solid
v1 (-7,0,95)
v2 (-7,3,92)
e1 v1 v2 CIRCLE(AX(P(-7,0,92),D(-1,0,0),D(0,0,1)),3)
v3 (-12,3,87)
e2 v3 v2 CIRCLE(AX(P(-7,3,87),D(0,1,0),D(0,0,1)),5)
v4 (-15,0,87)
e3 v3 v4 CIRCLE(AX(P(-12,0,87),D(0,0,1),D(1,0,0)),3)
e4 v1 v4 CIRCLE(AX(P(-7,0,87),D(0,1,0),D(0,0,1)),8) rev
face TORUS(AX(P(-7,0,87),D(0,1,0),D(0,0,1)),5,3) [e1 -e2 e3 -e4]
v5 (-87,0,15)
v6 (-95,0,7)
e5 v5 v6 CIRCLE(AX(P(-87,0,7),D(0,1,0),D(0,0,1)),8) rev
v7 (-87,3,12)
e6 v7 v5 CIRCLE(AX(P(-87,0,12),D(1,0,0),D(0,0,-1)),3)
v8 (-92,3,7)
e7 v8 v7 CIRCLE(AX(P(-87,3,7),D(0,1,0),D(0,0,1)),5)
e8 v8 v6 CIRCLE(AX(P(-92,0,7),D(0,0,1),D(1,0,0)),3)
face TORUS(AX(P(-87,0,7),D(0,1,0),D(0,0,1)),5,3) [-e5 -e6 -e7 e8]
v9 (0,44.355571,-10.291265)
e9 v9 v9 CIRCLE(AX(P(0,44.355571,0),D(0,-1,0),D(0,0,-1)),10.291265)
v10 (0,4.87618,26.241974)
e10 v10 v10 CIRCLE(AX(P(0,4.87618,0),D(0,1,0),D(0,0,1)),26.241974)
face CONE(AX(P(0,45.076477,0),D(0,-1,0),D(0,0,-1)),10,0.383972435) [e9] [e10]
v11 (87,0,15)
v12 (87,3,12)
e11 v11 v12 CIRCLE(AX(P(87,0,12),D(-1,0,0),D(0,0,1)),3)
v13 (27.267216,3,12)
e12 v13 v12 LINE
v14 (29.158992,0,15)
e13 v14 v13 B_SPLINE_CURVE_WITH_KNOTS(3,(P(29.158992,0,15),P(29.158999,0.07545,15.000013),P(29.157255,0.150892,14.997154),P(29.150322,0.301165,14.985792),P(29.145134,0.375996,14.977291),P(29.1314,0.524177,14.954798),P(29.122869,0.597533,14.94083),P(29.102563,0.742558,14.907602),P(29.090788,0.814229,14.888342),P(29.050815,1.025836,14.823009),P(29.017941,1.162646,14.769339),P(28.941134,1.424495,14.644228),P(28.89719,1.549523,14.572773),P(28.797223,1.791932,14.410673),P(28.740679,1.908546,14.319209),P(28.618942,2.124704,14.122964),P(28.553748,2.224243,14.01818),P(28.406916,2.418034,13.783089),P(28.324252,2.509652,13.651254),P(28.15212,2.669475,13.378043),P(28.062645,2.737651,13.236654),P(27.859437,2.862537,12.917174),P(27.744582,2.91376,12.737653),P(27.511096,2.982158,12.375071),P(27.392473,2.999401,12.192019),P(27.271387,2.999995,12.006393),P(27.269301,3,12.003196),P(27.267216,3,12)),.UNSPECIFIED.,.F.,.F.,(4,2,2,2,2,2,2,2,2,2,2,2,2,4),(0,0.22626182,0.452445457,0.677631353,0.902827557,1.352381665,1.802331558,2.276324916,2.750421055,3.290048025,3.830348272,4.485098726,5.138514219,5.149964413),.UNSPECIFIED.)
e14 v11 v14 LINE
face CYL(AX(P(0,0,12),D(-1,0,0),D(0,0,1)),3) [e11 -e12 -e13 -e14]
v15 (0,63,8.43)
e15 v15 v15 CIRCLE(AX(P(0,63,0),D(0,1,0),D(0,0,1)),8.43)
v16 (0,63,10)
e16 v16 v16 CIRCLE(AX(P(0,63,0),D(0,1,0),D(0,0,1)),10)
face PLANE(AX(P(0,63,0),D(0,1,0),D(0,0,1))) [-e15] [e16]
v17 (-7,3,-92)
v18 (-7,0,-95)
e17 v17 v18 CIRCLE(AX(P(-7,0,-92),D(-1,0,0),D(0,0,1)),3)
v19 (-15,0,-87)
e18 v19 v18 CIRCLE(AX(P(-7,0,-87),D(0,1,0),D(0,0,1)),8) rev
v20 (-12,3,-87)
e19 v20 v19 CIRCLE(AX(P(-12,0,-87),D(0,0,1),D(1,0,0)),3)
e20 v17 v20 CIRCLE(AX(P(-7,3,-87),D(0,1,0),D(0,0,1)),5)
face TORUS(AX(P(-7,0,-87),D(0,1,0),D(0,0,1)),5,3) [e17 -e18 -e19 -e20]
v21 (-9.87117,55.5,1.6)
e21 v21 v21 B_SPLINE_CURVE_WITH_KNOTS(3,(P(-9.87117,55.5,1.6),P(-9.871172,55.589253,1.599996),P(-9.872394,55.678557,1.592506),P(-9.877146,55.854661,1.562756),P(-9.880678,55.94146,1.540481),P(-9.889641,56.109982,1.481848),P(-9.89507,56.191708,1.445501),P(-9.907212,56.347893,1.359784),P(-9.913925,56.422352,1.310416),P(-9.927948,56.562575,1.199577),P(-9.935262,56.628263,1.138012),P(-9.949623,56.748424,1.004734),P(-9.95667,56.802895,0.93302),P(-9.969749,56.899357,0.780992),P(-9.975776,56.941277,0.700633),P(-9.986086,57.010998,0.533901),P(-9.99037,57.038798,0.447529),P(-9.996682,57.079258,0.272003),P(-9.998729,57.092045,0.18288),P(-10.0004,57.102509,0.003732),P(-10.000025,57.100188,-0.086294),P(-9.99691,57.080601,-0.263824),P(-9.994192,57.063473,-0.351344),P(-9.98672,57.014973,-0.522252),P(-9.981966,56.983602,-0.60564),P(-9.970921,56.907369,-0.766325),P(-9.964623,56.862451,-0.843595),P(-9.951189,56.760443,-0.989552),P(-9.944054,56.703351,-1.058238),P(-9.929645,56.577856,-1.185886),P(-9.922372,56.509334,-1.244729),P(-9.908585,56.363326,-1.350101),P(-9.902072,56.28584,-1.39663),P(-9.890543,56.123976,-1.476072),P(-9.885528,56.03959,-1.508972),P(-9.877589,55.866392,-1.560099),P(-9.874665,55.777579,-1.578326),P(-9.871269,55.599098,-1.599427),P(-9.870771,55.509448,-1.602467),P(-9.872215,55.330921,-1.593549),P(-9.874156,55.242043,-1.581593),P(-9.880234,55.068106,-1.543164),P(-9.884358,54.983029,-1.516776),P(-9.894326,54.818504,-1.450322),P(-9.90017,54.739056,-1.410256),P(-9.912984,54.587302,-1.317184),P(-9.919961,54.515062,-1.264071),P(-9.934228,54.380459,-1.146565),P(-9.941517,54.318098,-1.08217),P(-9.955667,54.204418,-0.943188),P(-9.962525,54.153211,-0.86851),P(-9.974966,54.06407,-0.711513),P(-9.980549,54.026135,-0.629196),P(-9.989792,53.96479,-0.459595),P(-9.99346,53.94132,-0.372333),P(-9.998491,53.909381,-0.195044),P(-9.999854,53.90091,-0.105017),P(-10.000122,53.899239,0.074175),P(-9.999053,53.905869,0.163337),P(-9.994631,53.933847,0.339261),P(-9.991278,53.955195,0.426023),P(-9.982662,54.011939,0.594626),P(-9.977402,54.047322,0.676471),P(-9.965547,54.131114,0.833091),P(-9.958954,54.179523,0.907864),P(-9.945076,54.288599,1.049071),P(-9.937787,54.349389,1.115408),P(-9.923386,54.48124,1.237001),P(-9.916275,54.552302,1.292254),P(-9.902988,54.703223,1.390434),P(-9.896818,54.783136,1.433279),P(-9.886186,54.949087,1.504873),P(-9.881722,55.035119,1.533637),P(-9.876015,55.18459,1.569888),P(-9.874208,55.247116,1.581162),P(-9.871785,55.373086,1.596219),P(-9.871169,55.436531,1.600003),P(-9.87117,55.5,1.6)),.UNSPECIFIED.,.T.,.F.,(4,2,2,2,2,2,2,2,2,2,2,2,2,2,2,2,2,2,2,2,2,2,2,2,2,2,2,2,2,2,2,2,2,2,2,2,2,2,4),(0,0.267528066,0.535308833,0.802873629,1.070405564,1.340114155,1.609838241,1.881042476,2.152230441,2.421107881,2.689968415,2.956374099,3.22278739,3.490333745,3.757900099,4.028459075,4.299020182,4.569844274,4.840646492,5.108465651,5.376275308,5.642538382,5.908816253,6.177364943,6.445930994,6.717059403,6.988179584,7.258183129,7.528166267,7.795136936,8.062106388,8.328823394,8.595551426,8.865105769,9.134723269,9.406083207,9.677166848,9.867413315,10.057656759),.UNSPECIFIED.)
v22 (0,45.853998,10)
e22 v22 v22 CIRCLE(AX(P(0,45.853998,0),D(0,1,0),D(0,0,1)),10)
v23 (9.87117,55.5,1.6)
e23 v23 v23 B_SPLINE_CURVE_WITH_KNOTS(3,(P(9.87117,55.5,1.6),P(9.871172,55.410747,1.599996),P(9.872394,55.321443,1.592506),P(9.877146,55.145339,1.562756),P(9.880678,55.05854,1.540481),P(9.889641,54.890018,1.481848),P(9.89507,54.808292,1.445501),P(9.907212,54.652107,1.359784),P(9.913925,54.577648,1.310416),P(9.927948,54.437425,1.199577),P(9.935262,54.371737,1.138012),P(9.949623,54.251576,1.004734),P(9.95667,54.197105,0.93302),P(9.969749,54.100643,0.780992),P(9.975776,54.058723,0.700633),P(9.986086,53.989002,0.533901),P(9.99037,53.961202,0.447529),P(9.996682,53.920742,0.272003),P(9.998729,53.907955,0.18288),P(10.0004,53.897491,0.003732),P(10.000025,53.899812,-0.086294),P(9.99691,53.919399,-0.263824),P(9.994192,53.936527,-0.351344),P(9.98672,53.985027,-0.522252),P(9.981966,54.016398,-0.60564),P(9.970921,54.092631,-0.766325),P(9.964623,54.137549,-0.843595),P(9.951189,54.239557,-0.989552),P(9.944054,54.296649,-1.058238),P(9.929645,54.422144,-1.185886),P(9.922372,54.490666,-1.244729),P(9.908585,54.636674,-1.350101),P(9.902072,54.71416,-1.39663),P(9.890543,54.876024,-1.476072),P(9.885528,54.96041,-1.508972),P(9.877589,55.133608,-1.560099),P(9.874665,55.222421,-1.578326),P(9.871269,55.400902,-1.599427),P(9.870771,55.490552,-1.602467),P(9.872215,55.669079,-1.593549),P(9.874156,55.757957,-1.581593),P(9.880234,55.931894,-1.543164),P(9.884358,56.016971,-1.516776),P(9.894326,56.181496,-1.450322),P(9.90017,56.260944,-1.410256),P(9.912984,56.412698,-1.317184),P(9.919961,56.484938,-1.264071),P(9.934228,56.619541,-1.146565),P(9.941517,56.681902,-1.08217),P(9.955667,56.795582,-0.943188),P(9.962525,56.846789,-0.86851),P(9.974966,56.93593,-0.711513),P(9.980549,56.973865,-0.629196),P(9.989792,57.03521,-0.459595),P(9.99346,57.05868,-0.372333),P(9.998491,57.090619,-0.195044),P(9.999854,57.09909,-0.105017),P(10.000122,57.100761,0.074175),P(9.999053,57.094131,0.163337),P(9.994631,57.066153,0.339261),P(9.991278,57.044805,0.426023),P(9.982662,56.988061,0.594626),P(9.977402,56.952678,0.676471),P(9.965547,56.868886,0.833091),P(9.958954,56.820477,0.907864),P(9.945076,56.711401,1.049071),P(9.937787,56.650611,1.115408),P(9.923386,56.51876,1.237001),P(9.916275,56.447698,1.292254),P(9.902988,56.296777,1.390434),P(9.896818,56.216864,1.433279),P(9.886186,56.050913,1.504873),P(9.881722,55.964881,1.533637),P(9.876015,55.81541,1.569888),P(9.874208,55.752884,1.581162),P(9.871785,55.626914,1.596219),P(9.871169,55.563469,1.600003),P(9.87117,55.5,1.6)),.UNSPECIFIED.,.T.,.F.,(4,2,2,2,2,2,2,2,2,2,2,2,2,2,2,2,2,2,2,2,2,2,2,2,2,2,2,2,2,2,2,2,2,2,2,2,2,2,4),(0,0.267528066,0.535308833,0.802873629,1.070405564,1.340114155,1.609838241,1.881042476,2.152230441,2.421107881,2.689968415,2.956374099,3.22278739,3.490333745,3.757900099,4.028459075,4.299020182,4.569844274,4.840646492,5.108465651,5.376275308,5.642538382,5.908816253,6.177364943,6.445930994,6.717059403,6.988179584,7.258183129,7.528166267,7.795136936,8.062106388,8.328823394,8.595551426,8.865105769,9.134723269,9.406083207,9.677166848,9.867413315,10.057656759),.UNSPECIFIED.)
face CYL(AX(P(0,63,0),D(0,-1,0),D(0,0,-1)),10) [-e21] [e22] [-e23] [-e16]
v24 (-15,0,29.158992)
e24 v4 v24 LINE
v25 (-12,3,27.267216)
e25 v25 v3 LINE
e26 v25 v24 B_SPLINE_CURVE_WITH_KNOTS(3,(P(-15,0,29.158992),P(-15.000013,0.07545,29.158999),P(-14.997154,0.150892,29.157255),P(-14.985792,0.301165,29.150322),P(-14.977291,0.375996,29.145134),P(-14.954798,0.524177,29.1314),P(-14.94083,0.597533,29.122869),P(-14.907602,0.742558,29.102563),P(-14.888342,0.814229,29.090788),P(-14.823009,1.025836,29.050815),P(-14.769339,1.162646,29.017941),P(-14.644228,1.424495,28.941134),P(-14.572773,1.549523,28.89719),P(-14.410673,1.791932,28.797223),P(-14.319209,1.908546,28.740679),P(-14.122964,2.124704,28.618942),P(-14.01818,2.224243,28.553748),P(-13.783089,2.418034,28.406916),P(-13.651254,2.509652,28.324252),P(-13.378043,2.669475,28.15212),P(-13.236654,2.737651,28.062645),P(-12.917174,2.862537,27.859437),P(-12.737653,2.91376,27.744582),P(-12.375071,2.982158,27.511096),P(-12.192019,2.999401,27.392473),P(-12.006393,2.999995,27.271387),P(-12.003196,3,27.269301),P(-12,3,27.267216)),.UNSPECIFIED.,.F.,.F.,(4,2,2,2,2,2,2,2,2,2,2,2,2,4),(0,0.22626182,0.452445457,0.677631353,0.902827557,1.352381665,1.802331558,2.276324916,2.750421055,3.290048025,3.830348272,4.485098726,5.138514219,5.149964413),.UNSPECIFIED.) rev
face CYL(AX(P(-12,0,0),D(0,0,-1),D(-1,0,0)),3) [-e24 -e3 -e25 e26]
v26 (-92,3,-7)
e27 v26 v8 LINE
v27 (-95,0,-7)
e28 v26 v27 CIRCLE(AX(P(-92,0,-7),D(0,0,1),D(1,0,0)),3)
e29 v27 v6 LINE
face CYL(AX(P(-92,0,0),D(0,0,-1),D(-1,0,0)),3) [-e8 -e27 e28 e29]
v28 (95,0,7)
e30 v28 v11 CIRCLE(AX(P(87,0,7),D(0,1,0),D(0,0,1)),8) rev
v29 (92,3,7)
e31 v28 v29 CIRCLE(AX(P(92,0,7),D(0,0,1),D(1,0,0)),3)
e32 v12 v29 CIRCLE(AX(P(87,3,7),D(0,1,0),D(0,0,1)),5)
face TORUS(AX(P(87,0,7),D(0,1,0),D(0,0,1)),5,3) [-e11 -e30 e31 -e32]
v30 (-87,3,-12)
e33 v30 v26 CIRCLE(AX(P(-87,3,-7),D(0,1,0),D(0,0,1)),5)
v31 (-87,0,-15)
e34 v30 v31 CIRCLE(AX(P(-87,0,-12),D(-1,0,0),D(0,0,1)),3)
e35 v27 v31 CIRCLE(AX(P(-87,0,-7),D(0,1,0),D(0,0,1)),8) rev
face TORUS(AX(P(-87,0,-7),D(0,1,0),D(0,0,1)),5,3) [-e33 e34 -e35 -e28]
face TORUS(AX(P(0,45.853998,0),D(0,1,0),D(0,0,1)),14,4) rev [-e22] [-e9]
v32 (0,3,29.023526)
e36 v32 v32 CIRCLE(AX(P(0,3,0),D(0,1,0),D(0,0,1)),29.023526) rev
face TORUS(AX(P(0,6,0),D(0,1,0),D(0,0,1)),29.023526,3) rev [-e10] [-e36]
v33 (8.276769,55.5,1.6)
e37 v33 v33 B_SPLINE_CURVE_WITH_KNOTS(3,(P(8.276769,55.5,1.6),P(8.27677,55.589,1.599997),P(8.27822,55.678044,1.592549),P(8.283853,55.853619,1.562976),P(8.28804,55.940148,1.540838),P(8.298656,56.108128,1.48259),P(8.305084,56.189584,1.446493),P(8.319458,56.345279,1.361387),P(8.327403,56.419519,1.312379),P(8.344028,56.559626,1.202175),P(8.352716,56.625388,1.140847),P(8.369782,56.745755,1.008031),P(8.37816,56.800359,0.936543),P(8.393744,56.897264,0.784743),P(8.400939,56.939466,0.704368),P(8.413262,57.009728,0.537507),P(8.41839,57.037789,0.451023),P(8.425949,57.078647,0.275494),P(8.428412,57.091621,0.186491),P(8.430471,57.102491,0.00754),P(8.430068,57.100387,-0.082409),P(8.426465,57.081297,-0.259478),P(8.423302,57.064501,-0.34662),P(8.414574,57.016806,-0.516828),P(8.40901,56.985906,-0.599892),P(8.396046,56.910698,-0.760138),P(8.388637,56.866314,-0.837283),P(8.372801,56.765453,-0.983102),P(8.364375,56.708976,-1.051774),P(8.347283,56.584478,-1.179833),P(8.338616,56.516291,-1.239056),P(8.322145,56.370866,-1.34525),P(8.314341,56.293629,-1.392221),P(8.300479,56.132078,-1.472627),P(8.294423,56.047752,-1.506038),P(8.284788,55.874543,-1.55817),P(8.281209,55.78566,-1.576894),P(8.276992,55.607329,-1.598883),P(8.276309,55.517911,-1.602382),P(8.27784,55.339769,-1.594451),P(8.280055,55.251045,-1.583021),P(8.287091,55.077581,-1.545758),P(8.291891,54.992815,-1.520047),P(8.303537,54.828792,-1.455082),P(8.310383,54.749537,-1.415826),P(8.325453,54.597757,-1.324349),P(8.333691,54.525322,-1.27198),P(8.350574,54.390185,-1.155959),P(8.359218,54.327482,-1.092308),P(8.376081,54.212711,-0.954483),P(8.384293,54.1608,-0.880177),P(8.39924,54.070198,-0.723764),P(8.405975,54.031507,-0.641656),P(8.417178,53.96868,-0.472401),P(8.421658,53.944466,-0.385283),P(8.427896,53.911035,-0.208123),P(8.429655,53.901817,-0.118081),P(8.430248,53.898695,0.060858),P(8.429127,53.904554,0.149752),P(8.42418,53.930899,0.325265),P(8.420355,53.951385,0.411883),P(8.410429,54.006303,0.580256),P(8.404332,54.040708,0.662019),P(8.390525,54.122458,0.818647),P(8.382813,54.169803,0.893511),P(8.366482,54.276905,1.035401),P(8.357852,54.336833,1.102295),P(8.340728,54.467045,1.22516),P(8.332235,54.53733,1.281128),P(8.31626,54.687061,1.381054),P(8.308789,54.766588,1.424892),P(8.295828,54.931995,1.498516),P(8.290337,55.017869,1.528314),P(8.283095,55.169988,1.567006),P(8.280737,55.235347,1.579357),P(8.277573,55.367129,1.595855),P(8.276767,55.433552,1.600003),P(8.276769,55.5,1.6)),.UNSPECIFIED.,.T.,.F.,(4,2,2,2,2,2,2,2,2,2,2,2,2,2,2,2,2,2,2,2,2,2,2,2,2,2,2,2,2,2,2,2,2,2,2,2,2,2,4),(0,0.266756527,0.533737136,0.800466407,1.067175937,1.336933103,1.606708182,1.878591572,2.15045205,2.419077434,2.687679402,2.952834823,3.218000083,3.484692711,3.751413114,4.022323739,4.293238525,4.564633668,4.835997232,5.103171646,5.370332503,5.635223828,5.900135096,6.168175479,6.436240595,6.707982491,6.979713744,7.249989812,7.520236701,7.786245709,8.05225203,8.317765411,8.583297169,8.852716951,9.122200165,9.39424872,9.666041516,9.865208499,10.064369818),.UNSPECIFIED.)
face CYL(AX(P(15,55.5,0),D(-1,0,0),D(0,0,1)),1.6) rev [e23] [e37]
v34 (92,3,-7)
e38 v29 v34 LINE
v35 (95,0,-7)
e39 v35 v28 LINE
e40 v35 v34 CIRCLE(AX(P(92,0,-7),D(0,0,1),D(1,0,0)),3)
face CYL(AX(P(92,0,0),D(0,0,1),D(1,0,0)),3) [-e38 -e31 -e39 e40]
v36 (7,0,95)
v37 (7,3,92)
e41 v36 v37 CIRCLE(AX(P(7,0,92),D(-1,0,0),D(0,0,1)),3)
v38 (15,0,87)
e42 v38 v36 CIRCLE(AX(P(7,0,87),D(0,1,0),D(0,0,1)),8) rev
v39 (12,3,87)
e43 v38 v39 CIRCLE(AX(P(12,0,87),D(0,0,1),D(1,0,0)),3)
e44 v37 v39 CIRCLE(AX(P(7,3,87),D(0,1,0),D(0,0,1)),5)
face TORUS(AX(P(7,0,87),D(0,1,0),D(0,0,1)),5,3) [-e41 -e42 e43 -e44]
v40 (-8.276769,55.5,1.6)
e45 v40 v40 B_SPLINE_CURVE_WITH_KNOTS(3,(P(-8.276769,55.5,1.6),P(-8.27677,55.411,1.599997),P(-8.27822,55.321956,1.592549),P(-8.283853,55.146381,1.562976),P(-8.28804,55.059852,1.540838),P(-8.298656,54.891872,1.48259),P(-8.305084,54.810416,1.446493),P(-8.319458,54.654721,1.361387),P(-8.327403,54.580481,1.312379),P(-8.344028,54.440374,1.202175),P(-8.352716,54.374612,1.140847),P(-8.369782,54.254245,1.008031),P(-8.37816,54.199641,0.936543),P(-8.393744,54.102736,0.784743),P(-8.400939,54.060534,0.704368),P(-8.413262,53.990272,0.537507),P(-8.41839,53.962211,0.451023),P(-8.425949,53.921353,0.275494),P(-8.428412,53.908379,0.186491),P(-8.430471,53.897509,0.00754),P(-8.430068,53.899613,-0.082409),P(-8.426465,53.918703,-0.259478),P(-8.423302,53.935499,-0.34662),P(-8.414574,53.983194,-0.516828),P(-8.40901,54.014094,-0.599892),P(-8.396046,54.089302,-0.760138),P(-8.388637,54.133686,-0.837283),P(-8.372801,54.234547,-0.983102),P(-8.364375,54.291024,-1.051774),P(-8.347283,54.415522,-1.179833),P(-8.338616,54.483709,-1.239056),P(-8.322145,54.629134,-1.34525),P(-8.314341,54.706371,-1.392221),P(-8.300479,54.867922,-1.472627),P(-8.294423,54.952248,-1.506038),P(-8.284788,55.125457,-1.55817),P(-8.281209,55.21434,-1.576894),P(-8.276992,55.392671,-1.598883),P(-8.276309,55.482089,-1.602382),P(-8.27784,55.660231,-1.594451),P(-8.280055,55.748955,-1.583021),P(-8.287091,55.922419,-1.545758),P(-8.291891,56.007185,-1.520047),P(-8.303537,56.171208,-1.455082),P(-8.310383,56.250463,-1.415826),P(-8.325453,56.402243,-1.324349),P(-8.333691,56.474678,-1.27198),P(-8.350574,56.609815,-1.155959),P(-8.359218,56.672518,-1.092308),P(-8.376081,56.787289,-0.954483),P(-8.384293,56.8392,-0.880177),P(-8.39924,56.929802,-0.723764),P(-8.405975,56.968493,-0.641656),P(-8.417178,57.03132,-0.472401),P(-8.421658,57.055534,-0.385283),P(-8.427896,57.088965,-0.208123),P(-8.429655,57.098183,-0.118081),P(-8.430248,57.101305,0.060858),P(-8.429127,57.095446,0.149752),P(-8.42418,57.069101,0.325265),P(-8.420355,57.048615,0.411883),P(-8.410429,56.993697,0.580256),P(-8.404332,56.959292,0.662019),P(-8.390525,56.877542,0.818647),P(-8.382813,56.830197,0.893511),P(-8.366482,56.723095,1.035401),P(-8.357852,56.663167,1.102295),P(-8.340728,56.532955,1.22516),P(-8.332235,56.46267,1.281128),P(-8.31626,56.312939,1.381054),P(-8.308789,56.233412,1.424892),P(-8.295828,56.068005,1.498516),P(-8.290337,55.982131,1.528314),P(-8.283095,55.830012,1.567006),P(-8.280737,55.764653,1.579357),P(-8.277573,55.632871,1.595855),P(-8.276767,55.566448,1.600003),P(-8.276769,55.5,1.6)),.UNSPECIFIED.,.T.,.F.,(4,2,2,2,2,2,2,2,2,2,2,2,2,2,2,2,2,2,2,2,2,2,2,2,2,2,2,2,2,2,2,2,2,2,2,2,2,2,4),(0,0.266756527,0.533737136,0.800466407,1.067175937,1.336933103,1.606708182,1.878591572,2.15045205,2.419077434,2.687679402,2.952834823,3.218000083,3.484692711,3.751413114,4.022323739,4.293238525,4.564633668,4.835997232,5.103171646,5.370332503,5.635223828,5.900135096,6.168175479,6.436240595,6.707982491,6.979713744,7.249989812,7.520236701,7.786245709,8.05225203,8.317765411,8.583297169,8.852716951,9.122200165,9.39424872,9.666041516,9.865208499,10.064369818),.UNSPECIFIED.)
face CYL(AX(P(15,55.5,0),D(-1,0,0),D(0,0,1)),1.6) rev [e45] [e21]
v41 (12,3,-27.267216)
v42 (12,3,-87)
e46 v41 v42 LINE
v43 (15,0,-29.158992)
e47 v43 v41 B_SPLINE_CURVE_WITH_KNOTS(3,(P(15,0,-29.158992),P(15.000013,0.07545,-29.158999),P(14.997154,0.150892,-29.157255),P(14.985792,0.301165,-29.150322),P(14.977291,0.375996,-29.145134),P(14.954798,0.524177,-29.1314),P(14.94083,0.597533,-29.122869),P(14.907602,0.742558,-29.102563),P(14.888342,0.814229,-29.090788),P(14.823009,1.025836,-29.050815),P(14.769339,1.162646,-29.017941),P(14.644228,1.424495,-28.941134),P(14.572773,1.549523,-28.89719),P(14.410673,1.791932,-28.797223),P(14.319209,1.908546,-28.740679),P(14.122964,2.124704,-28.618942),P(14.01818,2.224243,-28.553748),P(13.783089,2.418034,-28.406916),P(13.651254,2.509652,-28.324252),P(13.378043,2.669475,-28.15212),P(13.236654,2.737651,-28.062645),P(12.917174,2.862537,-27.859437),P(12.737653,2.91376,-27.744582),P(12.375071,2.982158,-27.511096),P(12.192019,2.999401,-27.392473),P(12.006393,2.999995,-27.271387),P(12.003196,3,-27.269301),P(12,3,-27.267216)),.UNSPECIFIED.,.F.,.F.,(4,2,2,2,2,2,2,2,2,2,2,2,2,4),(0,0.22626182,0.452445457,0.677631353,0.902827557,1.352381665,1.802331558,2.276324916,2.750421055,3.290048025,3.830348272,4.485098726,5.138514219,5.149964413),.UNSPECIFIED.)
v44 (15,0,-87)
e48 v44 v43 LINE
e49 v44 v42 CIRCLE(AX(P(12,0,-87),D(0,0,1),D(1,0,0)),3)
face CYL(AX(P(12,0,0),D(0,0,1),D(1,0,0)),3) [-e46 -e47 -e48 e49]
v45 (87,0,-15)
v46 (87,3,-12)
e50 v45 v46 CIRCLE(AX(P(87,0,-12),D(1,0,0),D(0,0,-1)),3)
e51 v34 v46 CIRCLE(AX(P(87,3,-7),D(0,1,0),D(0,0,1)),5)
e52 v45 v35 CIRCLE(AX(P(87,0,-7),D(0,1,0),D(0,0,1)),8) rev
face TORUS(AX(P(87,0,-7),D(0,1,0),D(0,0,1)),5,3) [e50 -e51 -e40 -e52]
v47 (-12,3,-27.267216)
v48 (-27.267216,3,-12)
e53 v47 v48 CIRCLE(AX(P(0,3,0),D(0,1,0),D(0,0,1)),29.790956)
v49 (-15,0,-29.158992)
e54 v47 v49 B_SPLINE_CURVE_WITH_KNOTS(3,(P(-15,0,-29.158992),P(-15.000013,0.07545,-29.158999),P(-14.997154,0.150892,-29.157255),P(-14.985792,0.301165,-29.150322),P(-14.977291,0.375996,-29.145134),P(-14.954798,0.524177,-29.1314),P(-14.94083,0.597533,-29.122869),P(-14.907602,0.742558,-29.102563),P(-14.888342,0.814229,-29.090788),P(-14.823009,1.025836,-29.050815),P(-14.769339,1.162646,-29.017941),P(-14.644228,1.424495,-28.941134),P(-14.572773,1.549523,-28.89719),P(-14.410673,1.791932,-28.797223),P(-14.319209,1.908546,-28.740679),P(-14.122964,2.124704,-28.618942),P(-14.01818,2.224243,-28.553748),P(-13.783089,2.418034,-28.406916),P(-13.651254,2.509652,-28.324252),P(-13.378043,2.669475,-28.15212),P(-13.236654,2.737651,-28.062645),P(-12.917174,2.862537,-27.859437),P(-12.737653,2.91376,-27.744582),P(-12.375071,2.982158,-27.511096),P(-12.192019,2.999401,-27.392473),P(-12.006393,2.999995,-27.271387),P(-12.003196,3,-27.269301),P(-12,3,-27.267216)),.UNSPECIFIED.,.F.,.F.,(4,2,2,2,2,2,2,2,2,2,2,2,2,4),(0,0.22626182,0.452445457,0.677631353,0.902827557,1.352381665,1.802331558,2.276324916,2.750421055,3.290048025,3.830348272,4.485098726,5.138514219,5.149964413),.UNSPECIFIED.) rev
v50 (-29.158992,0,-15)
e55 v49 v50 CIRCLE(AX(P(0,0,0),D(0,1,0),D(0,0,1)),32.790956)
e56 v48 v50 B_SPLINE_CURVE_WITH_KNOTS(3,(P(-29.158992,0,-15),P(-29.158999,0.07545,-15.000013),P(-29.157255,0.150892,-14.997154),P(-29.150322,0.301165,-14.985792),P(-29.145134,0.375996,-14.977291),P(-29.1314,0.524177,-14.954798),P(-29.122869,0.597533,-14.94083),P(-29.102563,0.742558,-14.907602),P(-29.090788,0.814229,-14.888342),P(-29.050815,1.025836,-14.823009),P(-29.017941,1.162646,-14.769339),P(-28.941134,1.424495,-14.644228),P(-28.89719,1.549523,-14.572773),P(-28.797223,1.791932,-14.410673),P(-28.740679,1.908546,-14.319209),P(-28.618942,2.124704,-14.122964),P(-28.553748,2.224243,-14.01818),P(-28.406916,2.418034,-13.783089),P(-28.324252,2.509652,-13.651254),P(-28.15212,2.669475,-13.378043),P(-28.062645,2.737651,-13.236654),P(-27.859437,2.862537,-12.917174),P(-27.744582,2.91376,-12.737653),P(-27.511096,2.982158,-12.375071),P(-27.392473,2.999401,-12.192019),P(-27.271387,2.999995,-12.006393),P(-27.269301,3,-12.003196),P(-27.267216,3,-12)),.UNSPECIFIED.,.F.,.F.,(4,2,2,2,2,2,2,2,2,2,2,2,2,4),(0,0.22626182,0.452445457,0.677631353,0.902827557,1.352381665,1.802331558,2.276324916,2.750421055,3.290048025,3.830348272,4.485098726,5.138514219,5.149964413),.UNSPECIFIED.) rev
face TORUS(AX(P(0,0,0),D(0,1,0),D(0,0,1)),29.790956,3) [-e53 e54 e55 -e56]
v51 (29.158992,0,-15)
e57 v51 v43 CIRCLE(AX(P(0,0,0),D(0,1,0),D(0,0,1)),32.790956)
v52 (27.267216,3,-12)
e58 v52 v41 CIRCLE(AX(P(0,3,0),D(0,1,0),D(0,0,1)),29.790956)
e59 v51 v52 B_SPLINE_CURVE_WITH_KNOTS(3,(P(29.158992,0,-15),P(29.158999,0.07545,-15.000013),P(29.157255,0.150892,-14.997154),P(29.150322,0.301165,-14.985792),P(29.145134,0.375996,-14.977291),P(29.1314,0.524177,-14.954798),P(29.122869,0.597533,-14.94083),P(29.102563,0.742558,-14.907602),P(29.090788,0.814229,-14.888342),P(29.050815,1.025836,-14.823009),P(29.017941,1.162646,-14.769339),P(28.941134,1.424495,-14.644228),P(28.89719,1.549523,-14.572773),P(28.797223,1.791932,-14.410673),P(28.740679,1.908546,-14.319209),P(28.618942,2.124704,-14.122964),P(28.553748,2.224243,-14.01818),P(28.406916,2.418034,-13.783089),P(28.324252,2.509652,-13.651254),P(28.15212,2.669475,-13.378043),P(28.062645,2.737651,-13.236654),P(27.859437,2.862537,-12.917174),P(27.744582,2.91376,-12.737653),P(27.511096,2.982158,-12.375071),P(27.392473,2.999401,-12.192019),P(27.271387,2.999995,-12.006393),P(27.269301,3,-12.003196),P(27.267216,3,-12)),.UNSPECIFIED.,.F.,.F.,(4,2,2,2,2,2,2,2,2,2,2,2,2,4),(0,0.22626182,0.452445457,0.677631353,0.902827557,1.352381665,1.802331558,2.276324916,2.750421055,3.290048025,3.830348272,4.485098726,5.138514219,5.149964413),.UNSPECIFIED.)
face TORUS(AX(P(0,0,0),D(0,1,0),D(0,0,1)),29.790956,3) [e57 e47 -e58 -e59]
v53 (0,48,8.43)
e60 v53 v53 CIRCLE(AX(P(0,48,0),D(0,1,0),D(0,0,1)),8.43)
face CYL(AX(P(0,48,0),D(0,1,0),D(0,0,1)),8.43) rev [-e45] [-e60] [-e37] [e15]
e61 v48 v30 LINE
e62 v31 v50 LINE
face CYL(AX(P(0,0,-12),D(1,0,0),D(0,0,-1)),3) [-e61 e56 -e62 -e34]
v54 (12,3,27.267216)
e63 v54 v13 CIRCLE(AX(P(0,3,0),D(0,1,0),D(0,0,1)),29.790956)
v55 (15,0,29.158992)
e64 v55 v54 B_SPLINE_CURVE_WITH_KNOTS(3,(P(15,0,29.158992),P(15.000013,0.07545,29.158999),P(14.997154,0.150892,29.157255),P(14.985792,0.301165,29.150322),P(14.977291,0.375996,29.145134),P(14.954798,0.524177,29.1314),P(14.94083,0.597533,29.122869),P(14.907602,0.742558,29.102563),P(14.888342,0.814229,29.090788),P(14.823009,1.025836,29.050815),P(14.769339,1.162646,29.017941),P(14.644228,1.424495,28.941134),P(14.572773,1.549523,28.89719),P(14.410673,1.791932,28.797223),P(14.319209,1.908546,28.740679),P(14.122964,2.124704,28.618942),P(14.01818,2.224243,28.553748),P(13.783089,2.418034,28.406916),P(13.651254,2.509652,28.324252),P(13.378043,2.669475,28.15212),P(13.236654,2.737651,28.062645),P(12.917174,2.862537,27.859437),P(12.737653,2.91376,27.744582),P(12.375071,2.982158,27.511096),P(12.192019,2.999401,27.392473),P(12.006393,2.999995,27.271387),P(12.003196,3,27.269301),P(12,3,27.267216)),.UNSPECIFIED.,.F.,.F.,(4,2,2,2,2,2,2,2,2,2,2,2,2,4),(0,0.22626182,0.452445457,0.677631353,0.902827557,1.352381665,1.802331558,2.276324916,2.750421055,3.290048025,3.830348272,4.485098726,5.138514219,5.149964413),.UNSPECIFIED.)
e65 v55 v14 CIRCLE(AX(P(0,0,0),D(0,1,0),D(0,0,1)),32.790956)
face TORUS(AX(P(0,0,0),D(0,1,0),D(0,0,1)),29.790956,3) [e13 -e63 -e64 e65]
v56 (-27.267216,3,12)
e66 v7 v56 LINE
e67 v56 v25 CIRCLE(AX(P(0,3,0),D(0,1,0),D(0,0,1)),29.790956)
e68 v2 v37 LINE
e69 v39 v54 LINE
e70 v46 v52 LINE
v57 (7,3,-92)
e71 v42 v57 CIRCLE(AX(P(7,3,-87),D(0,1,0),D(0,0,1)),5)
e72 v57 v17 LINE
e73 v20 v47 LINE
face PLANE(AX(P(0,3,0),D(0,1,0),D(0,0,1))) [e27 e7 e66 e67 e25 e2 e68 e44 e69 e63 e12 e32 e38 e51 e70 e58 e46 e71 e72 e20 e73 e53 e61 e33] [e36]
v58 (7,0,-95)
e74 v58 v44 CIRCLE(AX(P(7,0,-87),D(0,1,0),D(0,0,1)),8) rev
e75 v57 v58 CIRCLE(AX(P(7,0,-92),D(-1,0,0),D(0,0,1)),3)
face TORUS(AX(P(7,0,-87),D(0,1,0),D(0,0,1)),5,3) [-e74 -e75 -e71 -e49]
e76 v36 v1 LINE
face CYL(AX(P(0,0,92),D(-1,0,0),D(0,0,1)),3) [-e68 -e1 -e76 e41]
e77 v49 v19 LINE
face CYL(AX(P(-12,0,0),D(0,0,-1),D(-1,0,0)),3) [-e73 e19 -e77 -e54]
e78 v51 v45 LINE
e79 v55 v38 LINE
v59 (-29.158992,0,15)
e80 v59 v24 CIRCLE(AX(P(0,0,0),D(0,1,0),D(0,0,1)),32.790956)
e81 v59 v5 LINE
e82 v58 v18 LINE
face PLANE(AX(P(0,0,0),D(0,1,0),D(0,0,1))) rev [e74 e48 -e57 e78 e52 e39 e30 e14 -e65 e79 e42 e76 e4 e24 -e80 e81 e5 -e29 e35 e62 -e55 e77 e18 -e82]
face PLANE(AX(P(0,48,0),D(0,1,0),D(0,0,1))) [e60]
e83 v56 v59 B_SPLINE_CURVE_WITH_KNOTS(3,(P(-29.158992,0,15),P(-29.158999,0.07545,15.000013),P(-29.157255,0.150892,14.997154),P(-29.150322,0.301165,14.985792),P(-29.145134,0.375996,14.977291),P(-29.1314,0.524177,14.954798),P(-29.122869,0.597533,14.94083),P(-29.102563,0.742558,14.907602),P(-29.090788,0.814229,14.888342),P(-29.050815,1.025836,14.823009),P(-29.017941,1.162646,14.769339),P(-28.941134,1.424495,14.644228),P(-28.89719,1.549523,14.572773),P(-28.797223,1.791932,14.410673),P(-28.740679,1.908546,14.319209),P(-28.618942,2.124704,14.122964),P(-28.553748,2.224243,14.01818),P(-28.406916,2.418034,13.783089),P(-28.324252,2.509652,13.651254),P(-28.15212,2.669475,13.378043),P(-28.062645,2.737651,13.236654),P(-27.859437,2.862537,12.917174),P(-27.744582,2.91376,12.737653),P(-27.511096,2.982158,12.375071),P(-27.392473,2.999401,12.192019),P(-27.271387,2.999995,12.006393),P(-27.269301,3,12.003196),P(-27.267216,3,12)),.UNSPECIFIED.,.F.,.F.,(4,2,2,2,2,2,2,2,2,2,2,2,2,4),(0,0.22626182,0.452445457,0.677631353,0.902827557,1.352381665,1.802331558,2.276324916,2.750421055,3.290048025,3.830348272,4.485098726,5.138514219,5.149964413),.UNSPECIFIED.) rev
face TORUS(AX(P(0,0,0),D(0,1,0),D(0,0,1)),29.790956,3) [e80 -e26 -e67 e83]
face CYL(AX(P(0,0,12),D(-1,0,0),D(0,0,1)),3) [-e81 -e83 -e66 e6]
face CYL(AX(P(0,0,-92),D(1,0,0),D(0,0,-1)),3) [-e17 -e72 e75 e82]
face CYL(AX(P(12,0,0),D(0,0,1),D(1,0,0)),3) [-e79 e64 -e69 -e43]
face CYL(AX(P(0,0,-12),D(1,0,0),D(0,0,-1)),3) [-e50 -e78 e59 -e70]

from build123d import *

# Parameters (mm, degrees)
BOSS_EXTRUDE1_DEPTH     = 3
FILLET4_R               = 8
FILLET5_R               = 3
SKETCH4_R               = 10
BOSS_EXTRUDE4_DEPTH     = 60
CHAMFER2_SIZE           = 17
CHAMFER2_SIZE2          = 42.076476508
FILLET7_R               = 4
FILLET8_R               = 3
SKETCH6_R               = 8.43
CUT_EXTRUDE2_DEPTH      = 15
CUT_EXTRUDE3_DEPTH      = 15
CUT_EXTRUDE3_DEPTH_BACK = 15


with BuildPart() as part:
    # Sketch1 → Boss-Extrude1 (new body)
    with BuildSketch(Plane(origin=(0, 0, 0), x_dir=(1, 0, 0), z_dir=(0, 1, 0))):
        with BuildLine():
            ThreePointArc((29.158991571, 15), (31.870032918, 7.716721534), (32.790955909, 0))
            Line((32.790955909, 0), (95, 0))
            Line((95, 0), (95, 15))
            Line((95, 15), (29.158991571, 15))
        make_face()
        with BuildLine():
            Line((95, 0), (32.790955909, 0))
            ThreePointArc((32.790955909, 0), (31.870032918, -7.716721534), (29.158991571, -15))
            Line((29.158991571, -15), (95, -15))
            Line((95, -15), (95, 0))
        make_face()
        with BuildLine():
            ThreePointArc((15, 29.158991571), (7.716721534, 31.870032918), (0, 32.790955909))
            Line((0, 32.790955909), (0, 0))
            Line((0, 0), (32.790955909, 0))
            ThreePointArc((32.790955909, 0), (31.870032918, 7.716721534), (29.158991571, 15))
            ThreePointArc((29.158991571, 15), (23.186707285, 23.186707285), (15, 29.158991571))
        make_face()
        with BuildLine():
            Line((0, 0), (0, 32.790955909))
            ThreePointArc((0, 32.790955909), (-7.716721534, 31.870032918), (-15, 29.158991571))
            ThreePointArc((-15, 29.158991571), (-23.186707285, 23.186707285), (-29.158991571, 15))
            ThreePointArc((-29.158991571, 15), (-31.870032918, 7.716721534), (-32.790955909, 0))
            Line((-32.790955909, 0), (0, 0))
        make_face()
        with BuildLine():
            Line((32.790955909, 0), (0, 0))
            Line((0, 0), (0, -32.790955909))
            ThreePointArc((0, -32.790955909), (7.716721534, -31.870032918), (15, -29.158991571))
            ThreePointArc((15, -29.158991571), (23.186707285, -23.186707285), (29.158991571, -15))
            ThreePointArc((29.158991571, -15), (31.870032918, -7.716721534), (32.790955909, 0))
        make_face()
        with BuildLine():
            Line((0, -32.790955909), (0, 0))
            Line((0, 0), (-32.790955909, 0))
            ThreePointArc((-32.790955909, 0), (-31.870032918, -7.716721534), (-29.158991571, -15))
            ThreePointArc((-29.158991571, -15), (-23.186707285, -23.186707285), (-15, -29.158991571))
            ThreePointArc((-15, -29.158991571), (-7.716721534, -31.870032918), (0, -32.790955909))
        make_face()
        with BuildLine():
            ThreePointArc((15, 29.158991571), (7.716721534, 31.870032918), (0, 32.790955909))
            Line((0, 32.790955909), (0, 0))
            Line((0, 0), (32.790955909, 0))
            ThreePointArc((32.790955909, 0), (31.870032918, 7.716721534), (29.158991571, 15))
            ThreePointArc((29.158991571, 15), (23.186707285, 23.186707285), (15, 29.158991571))
        make_face()
        with BuildLine():
            Line((0, 0), (0, 32.790955909))
            ThreePointArc((0, 32.790955909), (-7.716721534, 31.870032918), (-15, 29.158991571))
            ThreePointArc((-15, 29.158991571), (-23.186707285, 23.186707285), (-29.158991571, 15))
            ThreePointArc((-29.158991571, 15), (-31.870032918, 7.716721534), (-32.790955909, 0))
            Line((-32.790955909, 0), (0, 0))
        make_face()
        with BuildLine():
            Line((32.790955909, 0), (0, 0))
            Line((0, 0), (0, -32.790955909))
            ThreePointArc((0, -32.790955909), (7.716721534, -31.870032918), (15, -29.158991571))
            ThreePointArc((15, -29.158991571), (23.186707285, -23.186707285), (29.158991571, -15))
            ThreePointArc((29.158991571, -15), (31.870032918, -7.716721534), (32.790955909, 0))
        make_face()
        with BuildLine():
            Line((0, -32.790955909), (0, 0))
            Line((0, 0), (-32.790955909, 0))
            ThreePointArc((-32.790955909, 0), (-31.870032918, -7.716721534), (-29.158991571, -15))
            ThreePointArc((-29.158991571, -15), (-23.186707285, -23.186707285), (-15, -29.158991571))
            ThreePointArc((-15, -29.158991571), (-7.716721534, -31.870032918), (0, -32.790955909))
        make_face()
        with BuildLine():
            ThreePointArc((15, 29.158991571), (7.716721534, 31.870032918), (0, 32.790955909))
            Line((0, 32.790955909), (0, 0))
            Line((0, 0), (32.790955909, 0))
            ThreePointArc((32.790955909, 0), (31.870032918, 7.716721534), (29.158991571, 15))
            ThreePointArc((29.158991571, 15), (23.186707285, 23.186707285), (15, 29.158991571))
        make_face()
        with BuildLine():
            Line((0, 0), (0, 32.790955909))
            ThreePointArc((0, 32.790955909), (-7.716721534, 31.870032918), (-15, 29.158991571))
            ThreePointArc((-15, 29.158991571), (-23.186707285, 23.186707285), (-29.158991571, 15))
            ThreePointArc((-29.158991571, 15), (-31.870032918, 7.716721534), (-32.790955909, 0))
            Line((-32.790955909, 0), (0, 0))
        make_face()
        with BuildLine():
            Line((32.790955909, 0), (0, 0))
            Line((0, 0), (0, -32.790955909))
            ThreePointArc((0, -32.790955909), (7.716721534, -31.870032918), (15, -29.158991571))
            ThreePointArc((15, -29.158991571), (23.186707285, -23.186707285), (29.158991571, -15))
            ThreePointArc((29.158991571, -15), (31.870032918, -7.716721534), (32.790955909, 0))
        make_face()
        with BuildLine():
            Line((0, -32.790955909), (0, 0))
            Line((0, 0), (-32.790955909, 0))
            ThreePointArc((-32.790955909, 0), (-31.870032918, -7.716721534), (-29.158991571, -15))
            ThreePointArc((-29.158991571, -15), (-23.186707285, -23.186707285), (-15, -29.158991571))
            ThreePointArc((-15, -29.158991571), (-7.716721534, -31.870032918), (0, -32.790955909))
        make_face()
        with BuildLine():
            ThreePointArc((15, 29.158991571), (7.716721534, 31.870032918), (0, 32.790955909))
            Line((0, 32.790955909), (0, 0))
            Line((0, 0), (32.790955909, 0))
            ThreePointArc((32.790955909, 0), (31.870032918, 7.716721534), (29.158991571, 15))
            ThreePointArc((29.158991571, 15), (23.186707285, 23.186707285), (15, 29.158991571))
        make_face()
        with BuildLine():
            Line((0, 0), (0, 32.790955909))
            ThreePointArc((0, 32.790955909), (-7.716721534, 31.870032918), (-15, 29.158991571))
            ThreePointArc((-15, 29.158991571), (-23.186707285, 23.186707285), (-29.158991571, 15))
            ThreePointArc((-29.158991571, 15), (-31.870032918, 7.716721534), (-32.790955909, 0))
            Line((-32.790955909, 0), (0, 0))
        make_face()
        with BuildLine():
            Line((32.790955909, 0), (0, 0))
            Line((0, 0), (0, -32.790955909))
            ThreePointArc((0, -32.790955909), (7.716721534, -31.870032918), (15, -29.158991571))
            ThreePointArc((15, -29.158991571), (23.186707285, -23.186707285), (29.158991571, -15))
            ThreePointArc((29.158991571, -15), (31.870032918, -7.716721534), (32.790955909, 0))
        make_face()
        with BuildLine():
            Line((0, -32.790955909), (0, 0))
            Line((0, 0), (-32.790955909, 0))
            ThreePointArc((-32.790955909, 0), (-31.870032918, -7.716721534), (-29.158991571, -15))
            ThreePointArc((-29.158991571, -15), (-23.186707285, -23.186707285), (-15, -29.158991571))
            ThreePointArc((-15, -29.158991571), (-7.716721534, -31.870032918), (0, -32.790955909))
        make_face()
        with BuildLine():
            Line((0, 32.790955909), (0, 95))
            Line((0, 95), (-15, 95))
            Line((-15, 95), (-15, 29.158991571))
            ThreePointArc((-15, 29.158991571), (-7.716721534, 31.870032918), (0, 32.790955909))
        make_face()
        with BuildLine():
            Line((15, 95), (0, 95))
            Line((0, 95), (0, 32.790955909))
            ThreePointArc((0, 32.790955909), (7.716721534, 31.870032918), (15, 29.158991571))
            Line((15, 29.158991571), (15, 95))
        make_face()
        with BuildLine():
            Line((-95, 0), (-32.790955909, 0))
            ThreePointArc((-32.790955909, 0), (-31.870032918, 7.716721534), (-29.158991571, 15))
            Line((-29.158991571, 15), (-95, 15))
            Line((-95, 15), (-95, 0))
        make_face()
        with BuildLine():
            ThreePointArc((-29.158991571, -15), (-31.870032918, -7.716721534), (-32.790955909, 0))
            Line((-32.790955909, 0), (-95, 0))
            Line((-95, 0), (-95, -15))
            Line((-95, -15), (-29.158991571, -15))
        make_face()
        with BuildLine():
            Line((0, -95), (0, -32.790955909))
            ThreePointArc((0, -32.790955909), (-7.716721534, -31.870032918), (-15, -29.158991571))
            Line((-15, -29.158991571), (-15, -95))
            Line((-15, -95), (0, -95))
        make_face()
        with BuildLine():
            ThreePointArc((15, -29.158991571), (7.716721534, -31.870032918), (0, -32.790955909))
            Line((0, -32.790955909), (0, -95))
            Line((0, -95), (15, -95))
            Line((15, -95), (15, -29.158991571))
        make_face()
    extrude(amount=BOSS_EXTRUDE1_DEPTH)

    # Fillet4
    fillet4_edges = [part.edges().sort_by_distance(p)[0] for p in [
        (95, 1.5, -15),
        (95, 1.5, 15),
        (15, 1.5, 95),
        (-15, 1.5, 95),
        (-95, 1.5, 15),
        (-95, 1.5, -15),
        (-15, 1.5, -95),
        (15, 1.5, -95),
    ]]
    fillet(fillet4_edges, radius=FILLET4_R)

    # Fillet5
    fillet5_edges = [part.edges().sort_by_distance(p)[0] for p in [
        (-12.656854249, 3, 92.656854249),
        (-15, 3, 58.079495785),
        (-23.186707285, 3, 23.186707285),
        (-58.079495785, 3, 15),
        (-92.656854249, 3, 12.656854249),
        (-95, 3, 0),
        (-92.656854249, 3, -12.656854249),
        (-58.079495785, 3, -15),
        (-23.186707285, 3, -23.186707285),
        (-15, 3, -58.079495785),
        (-12.656854249, 3, -92.656854249),
        (0, 3, -95),
        (12.656854249, 3, -92.656854249),
        (15, 3, -58.079495785),
        (23.186707285, 3, -23.186707285),
        (58.079495785, 3, -15),
        (92.656854249, 3, -12.656854249),
        (95, 3, 0),
        (92.656854249, 3, 12.656854249),
        (58.079495785, 3, 15),
        (23.186707285, 3, 23.186707285),
        (15, 3, 58.079495785),
        (12.656854249, 3, 92.656854249),
        (0, 3, 95),
    ]]
    fillet(fillet5_edges, radius=FILLET5_R - 0.0001)  # a hair under: the kernel refuses the full size

    # Sketch4 → Boss-Extrude4 (add)
    with BuildSketch(Plane(origin=(0, 3, 0), x_dir=(1, 0, 0), z_dir=(0, 1, 0))):
        with Locations(Location((0, 0, 0), (0, 0, 270))):
            Circle(SKETCH4_R)
    extrude(amount=BOSS_EXTRUDE4_DEPTH)

    # Chamfer2
    chamfer2_edges = [part.edges().sort_by_distance(p)[0] for p in [
        (0, 3, -10),
    ]]
    chamfer2_side = [part.faces().sort_by_distance(p)[0] for p in [
        (9.397944217, 3, 57.133640491),
    ]]
    chamfer(chamfer2_edges, length=CHAMFER2_SIZE, length2=CHAMFER2_SIZE2, reference=chamfer2_side[0])

    # Fillet7
    fillet7_edges = [part.edges().sort_by_distance(p)[0] for p in [
        (0, 45.076476508, -10),
    ]]
    fillet(fillet7_edges, radius=FILLET7_R)

    # Fillet8
    fillet8_edges = [part.edges().sort_by_distance(p)[0] for p in [
        (0, 3, -27),
    ]]
    fillet(fillet8_edges, radius=FILLET8_R)

    # Sketch6 → Cut-Extrude2 (cut)
    with BuildSketch(Plane(origin=(0, 63, 0), x_dir=(1, 0, 0), z_dir=(0, 1, 0))):
        with Locations(Location((0, 0, 0), (0, 0, 270))):
            Circle(SKETCH6_R)
    extrude(amount=-CUT_EXTRUDE2_DEPTH, mode=Mode.SUBTRACT)

    # Sketch8 → Cut-Extrude3 (cut, two sides: drawn at the far end of the back side and taken through both)
    with BuildSketch(Plane(origin=(0, 0, 0), x_dir=(0, 0, -1), z_dir=(1, 0, 0)).offset(-CUT_EXTRUDE3_DEPTH_BACK)):
        with BuildLine():
            Line((0, 55.5), (0, 57.1))
            ThreePointArc((0, 57.1), (-1.6, 55.5), (0, 53.9))
            Line((0, 53.9), (0, 55.5))
        make_face()
        with BuildLine():
            ThreePointArc((1.6, 55.5), (1.13137085, 56.63137085), (0, 57.1))
            Line((0, 57.1), (0, 55.5))
            Line((0, 55.5), (1.6, 55.5))
        make_face()
        with BuildLine():
            Line((1.6, 55.5), (0, 55.5))
            Line((0, 55.5), (0, 53.9))
            ThreePointArc((0, 53.9), (1.13137085, 54.36862915), (1.6, 55.5))
        make_face()
        with BuildLine():
            ThreePointArc((1.6, 55.5), (1.13137085, 56.63137085), (0, 57.1))
            Line((0, 57.1), (0, 55.5))
            Line((0, 55.5), (1.6, 55.5))
        make_face()
        with BuildLine():
            Line((1.6, 55.5), (0, 55.5))
            Line((0, 55.5), (0, 53.9))
            ThreePointArc((0, 53.9), (1.13137085, 54.36862915), (1.6, 55.5))
        make_face()
    extrude(amount=CUT_EXTRUDE3_DEPTH + CUT_EXTRUDE3_DEPTH_BACK, mode=Mode.SUBTRACT)


solid = part.part
